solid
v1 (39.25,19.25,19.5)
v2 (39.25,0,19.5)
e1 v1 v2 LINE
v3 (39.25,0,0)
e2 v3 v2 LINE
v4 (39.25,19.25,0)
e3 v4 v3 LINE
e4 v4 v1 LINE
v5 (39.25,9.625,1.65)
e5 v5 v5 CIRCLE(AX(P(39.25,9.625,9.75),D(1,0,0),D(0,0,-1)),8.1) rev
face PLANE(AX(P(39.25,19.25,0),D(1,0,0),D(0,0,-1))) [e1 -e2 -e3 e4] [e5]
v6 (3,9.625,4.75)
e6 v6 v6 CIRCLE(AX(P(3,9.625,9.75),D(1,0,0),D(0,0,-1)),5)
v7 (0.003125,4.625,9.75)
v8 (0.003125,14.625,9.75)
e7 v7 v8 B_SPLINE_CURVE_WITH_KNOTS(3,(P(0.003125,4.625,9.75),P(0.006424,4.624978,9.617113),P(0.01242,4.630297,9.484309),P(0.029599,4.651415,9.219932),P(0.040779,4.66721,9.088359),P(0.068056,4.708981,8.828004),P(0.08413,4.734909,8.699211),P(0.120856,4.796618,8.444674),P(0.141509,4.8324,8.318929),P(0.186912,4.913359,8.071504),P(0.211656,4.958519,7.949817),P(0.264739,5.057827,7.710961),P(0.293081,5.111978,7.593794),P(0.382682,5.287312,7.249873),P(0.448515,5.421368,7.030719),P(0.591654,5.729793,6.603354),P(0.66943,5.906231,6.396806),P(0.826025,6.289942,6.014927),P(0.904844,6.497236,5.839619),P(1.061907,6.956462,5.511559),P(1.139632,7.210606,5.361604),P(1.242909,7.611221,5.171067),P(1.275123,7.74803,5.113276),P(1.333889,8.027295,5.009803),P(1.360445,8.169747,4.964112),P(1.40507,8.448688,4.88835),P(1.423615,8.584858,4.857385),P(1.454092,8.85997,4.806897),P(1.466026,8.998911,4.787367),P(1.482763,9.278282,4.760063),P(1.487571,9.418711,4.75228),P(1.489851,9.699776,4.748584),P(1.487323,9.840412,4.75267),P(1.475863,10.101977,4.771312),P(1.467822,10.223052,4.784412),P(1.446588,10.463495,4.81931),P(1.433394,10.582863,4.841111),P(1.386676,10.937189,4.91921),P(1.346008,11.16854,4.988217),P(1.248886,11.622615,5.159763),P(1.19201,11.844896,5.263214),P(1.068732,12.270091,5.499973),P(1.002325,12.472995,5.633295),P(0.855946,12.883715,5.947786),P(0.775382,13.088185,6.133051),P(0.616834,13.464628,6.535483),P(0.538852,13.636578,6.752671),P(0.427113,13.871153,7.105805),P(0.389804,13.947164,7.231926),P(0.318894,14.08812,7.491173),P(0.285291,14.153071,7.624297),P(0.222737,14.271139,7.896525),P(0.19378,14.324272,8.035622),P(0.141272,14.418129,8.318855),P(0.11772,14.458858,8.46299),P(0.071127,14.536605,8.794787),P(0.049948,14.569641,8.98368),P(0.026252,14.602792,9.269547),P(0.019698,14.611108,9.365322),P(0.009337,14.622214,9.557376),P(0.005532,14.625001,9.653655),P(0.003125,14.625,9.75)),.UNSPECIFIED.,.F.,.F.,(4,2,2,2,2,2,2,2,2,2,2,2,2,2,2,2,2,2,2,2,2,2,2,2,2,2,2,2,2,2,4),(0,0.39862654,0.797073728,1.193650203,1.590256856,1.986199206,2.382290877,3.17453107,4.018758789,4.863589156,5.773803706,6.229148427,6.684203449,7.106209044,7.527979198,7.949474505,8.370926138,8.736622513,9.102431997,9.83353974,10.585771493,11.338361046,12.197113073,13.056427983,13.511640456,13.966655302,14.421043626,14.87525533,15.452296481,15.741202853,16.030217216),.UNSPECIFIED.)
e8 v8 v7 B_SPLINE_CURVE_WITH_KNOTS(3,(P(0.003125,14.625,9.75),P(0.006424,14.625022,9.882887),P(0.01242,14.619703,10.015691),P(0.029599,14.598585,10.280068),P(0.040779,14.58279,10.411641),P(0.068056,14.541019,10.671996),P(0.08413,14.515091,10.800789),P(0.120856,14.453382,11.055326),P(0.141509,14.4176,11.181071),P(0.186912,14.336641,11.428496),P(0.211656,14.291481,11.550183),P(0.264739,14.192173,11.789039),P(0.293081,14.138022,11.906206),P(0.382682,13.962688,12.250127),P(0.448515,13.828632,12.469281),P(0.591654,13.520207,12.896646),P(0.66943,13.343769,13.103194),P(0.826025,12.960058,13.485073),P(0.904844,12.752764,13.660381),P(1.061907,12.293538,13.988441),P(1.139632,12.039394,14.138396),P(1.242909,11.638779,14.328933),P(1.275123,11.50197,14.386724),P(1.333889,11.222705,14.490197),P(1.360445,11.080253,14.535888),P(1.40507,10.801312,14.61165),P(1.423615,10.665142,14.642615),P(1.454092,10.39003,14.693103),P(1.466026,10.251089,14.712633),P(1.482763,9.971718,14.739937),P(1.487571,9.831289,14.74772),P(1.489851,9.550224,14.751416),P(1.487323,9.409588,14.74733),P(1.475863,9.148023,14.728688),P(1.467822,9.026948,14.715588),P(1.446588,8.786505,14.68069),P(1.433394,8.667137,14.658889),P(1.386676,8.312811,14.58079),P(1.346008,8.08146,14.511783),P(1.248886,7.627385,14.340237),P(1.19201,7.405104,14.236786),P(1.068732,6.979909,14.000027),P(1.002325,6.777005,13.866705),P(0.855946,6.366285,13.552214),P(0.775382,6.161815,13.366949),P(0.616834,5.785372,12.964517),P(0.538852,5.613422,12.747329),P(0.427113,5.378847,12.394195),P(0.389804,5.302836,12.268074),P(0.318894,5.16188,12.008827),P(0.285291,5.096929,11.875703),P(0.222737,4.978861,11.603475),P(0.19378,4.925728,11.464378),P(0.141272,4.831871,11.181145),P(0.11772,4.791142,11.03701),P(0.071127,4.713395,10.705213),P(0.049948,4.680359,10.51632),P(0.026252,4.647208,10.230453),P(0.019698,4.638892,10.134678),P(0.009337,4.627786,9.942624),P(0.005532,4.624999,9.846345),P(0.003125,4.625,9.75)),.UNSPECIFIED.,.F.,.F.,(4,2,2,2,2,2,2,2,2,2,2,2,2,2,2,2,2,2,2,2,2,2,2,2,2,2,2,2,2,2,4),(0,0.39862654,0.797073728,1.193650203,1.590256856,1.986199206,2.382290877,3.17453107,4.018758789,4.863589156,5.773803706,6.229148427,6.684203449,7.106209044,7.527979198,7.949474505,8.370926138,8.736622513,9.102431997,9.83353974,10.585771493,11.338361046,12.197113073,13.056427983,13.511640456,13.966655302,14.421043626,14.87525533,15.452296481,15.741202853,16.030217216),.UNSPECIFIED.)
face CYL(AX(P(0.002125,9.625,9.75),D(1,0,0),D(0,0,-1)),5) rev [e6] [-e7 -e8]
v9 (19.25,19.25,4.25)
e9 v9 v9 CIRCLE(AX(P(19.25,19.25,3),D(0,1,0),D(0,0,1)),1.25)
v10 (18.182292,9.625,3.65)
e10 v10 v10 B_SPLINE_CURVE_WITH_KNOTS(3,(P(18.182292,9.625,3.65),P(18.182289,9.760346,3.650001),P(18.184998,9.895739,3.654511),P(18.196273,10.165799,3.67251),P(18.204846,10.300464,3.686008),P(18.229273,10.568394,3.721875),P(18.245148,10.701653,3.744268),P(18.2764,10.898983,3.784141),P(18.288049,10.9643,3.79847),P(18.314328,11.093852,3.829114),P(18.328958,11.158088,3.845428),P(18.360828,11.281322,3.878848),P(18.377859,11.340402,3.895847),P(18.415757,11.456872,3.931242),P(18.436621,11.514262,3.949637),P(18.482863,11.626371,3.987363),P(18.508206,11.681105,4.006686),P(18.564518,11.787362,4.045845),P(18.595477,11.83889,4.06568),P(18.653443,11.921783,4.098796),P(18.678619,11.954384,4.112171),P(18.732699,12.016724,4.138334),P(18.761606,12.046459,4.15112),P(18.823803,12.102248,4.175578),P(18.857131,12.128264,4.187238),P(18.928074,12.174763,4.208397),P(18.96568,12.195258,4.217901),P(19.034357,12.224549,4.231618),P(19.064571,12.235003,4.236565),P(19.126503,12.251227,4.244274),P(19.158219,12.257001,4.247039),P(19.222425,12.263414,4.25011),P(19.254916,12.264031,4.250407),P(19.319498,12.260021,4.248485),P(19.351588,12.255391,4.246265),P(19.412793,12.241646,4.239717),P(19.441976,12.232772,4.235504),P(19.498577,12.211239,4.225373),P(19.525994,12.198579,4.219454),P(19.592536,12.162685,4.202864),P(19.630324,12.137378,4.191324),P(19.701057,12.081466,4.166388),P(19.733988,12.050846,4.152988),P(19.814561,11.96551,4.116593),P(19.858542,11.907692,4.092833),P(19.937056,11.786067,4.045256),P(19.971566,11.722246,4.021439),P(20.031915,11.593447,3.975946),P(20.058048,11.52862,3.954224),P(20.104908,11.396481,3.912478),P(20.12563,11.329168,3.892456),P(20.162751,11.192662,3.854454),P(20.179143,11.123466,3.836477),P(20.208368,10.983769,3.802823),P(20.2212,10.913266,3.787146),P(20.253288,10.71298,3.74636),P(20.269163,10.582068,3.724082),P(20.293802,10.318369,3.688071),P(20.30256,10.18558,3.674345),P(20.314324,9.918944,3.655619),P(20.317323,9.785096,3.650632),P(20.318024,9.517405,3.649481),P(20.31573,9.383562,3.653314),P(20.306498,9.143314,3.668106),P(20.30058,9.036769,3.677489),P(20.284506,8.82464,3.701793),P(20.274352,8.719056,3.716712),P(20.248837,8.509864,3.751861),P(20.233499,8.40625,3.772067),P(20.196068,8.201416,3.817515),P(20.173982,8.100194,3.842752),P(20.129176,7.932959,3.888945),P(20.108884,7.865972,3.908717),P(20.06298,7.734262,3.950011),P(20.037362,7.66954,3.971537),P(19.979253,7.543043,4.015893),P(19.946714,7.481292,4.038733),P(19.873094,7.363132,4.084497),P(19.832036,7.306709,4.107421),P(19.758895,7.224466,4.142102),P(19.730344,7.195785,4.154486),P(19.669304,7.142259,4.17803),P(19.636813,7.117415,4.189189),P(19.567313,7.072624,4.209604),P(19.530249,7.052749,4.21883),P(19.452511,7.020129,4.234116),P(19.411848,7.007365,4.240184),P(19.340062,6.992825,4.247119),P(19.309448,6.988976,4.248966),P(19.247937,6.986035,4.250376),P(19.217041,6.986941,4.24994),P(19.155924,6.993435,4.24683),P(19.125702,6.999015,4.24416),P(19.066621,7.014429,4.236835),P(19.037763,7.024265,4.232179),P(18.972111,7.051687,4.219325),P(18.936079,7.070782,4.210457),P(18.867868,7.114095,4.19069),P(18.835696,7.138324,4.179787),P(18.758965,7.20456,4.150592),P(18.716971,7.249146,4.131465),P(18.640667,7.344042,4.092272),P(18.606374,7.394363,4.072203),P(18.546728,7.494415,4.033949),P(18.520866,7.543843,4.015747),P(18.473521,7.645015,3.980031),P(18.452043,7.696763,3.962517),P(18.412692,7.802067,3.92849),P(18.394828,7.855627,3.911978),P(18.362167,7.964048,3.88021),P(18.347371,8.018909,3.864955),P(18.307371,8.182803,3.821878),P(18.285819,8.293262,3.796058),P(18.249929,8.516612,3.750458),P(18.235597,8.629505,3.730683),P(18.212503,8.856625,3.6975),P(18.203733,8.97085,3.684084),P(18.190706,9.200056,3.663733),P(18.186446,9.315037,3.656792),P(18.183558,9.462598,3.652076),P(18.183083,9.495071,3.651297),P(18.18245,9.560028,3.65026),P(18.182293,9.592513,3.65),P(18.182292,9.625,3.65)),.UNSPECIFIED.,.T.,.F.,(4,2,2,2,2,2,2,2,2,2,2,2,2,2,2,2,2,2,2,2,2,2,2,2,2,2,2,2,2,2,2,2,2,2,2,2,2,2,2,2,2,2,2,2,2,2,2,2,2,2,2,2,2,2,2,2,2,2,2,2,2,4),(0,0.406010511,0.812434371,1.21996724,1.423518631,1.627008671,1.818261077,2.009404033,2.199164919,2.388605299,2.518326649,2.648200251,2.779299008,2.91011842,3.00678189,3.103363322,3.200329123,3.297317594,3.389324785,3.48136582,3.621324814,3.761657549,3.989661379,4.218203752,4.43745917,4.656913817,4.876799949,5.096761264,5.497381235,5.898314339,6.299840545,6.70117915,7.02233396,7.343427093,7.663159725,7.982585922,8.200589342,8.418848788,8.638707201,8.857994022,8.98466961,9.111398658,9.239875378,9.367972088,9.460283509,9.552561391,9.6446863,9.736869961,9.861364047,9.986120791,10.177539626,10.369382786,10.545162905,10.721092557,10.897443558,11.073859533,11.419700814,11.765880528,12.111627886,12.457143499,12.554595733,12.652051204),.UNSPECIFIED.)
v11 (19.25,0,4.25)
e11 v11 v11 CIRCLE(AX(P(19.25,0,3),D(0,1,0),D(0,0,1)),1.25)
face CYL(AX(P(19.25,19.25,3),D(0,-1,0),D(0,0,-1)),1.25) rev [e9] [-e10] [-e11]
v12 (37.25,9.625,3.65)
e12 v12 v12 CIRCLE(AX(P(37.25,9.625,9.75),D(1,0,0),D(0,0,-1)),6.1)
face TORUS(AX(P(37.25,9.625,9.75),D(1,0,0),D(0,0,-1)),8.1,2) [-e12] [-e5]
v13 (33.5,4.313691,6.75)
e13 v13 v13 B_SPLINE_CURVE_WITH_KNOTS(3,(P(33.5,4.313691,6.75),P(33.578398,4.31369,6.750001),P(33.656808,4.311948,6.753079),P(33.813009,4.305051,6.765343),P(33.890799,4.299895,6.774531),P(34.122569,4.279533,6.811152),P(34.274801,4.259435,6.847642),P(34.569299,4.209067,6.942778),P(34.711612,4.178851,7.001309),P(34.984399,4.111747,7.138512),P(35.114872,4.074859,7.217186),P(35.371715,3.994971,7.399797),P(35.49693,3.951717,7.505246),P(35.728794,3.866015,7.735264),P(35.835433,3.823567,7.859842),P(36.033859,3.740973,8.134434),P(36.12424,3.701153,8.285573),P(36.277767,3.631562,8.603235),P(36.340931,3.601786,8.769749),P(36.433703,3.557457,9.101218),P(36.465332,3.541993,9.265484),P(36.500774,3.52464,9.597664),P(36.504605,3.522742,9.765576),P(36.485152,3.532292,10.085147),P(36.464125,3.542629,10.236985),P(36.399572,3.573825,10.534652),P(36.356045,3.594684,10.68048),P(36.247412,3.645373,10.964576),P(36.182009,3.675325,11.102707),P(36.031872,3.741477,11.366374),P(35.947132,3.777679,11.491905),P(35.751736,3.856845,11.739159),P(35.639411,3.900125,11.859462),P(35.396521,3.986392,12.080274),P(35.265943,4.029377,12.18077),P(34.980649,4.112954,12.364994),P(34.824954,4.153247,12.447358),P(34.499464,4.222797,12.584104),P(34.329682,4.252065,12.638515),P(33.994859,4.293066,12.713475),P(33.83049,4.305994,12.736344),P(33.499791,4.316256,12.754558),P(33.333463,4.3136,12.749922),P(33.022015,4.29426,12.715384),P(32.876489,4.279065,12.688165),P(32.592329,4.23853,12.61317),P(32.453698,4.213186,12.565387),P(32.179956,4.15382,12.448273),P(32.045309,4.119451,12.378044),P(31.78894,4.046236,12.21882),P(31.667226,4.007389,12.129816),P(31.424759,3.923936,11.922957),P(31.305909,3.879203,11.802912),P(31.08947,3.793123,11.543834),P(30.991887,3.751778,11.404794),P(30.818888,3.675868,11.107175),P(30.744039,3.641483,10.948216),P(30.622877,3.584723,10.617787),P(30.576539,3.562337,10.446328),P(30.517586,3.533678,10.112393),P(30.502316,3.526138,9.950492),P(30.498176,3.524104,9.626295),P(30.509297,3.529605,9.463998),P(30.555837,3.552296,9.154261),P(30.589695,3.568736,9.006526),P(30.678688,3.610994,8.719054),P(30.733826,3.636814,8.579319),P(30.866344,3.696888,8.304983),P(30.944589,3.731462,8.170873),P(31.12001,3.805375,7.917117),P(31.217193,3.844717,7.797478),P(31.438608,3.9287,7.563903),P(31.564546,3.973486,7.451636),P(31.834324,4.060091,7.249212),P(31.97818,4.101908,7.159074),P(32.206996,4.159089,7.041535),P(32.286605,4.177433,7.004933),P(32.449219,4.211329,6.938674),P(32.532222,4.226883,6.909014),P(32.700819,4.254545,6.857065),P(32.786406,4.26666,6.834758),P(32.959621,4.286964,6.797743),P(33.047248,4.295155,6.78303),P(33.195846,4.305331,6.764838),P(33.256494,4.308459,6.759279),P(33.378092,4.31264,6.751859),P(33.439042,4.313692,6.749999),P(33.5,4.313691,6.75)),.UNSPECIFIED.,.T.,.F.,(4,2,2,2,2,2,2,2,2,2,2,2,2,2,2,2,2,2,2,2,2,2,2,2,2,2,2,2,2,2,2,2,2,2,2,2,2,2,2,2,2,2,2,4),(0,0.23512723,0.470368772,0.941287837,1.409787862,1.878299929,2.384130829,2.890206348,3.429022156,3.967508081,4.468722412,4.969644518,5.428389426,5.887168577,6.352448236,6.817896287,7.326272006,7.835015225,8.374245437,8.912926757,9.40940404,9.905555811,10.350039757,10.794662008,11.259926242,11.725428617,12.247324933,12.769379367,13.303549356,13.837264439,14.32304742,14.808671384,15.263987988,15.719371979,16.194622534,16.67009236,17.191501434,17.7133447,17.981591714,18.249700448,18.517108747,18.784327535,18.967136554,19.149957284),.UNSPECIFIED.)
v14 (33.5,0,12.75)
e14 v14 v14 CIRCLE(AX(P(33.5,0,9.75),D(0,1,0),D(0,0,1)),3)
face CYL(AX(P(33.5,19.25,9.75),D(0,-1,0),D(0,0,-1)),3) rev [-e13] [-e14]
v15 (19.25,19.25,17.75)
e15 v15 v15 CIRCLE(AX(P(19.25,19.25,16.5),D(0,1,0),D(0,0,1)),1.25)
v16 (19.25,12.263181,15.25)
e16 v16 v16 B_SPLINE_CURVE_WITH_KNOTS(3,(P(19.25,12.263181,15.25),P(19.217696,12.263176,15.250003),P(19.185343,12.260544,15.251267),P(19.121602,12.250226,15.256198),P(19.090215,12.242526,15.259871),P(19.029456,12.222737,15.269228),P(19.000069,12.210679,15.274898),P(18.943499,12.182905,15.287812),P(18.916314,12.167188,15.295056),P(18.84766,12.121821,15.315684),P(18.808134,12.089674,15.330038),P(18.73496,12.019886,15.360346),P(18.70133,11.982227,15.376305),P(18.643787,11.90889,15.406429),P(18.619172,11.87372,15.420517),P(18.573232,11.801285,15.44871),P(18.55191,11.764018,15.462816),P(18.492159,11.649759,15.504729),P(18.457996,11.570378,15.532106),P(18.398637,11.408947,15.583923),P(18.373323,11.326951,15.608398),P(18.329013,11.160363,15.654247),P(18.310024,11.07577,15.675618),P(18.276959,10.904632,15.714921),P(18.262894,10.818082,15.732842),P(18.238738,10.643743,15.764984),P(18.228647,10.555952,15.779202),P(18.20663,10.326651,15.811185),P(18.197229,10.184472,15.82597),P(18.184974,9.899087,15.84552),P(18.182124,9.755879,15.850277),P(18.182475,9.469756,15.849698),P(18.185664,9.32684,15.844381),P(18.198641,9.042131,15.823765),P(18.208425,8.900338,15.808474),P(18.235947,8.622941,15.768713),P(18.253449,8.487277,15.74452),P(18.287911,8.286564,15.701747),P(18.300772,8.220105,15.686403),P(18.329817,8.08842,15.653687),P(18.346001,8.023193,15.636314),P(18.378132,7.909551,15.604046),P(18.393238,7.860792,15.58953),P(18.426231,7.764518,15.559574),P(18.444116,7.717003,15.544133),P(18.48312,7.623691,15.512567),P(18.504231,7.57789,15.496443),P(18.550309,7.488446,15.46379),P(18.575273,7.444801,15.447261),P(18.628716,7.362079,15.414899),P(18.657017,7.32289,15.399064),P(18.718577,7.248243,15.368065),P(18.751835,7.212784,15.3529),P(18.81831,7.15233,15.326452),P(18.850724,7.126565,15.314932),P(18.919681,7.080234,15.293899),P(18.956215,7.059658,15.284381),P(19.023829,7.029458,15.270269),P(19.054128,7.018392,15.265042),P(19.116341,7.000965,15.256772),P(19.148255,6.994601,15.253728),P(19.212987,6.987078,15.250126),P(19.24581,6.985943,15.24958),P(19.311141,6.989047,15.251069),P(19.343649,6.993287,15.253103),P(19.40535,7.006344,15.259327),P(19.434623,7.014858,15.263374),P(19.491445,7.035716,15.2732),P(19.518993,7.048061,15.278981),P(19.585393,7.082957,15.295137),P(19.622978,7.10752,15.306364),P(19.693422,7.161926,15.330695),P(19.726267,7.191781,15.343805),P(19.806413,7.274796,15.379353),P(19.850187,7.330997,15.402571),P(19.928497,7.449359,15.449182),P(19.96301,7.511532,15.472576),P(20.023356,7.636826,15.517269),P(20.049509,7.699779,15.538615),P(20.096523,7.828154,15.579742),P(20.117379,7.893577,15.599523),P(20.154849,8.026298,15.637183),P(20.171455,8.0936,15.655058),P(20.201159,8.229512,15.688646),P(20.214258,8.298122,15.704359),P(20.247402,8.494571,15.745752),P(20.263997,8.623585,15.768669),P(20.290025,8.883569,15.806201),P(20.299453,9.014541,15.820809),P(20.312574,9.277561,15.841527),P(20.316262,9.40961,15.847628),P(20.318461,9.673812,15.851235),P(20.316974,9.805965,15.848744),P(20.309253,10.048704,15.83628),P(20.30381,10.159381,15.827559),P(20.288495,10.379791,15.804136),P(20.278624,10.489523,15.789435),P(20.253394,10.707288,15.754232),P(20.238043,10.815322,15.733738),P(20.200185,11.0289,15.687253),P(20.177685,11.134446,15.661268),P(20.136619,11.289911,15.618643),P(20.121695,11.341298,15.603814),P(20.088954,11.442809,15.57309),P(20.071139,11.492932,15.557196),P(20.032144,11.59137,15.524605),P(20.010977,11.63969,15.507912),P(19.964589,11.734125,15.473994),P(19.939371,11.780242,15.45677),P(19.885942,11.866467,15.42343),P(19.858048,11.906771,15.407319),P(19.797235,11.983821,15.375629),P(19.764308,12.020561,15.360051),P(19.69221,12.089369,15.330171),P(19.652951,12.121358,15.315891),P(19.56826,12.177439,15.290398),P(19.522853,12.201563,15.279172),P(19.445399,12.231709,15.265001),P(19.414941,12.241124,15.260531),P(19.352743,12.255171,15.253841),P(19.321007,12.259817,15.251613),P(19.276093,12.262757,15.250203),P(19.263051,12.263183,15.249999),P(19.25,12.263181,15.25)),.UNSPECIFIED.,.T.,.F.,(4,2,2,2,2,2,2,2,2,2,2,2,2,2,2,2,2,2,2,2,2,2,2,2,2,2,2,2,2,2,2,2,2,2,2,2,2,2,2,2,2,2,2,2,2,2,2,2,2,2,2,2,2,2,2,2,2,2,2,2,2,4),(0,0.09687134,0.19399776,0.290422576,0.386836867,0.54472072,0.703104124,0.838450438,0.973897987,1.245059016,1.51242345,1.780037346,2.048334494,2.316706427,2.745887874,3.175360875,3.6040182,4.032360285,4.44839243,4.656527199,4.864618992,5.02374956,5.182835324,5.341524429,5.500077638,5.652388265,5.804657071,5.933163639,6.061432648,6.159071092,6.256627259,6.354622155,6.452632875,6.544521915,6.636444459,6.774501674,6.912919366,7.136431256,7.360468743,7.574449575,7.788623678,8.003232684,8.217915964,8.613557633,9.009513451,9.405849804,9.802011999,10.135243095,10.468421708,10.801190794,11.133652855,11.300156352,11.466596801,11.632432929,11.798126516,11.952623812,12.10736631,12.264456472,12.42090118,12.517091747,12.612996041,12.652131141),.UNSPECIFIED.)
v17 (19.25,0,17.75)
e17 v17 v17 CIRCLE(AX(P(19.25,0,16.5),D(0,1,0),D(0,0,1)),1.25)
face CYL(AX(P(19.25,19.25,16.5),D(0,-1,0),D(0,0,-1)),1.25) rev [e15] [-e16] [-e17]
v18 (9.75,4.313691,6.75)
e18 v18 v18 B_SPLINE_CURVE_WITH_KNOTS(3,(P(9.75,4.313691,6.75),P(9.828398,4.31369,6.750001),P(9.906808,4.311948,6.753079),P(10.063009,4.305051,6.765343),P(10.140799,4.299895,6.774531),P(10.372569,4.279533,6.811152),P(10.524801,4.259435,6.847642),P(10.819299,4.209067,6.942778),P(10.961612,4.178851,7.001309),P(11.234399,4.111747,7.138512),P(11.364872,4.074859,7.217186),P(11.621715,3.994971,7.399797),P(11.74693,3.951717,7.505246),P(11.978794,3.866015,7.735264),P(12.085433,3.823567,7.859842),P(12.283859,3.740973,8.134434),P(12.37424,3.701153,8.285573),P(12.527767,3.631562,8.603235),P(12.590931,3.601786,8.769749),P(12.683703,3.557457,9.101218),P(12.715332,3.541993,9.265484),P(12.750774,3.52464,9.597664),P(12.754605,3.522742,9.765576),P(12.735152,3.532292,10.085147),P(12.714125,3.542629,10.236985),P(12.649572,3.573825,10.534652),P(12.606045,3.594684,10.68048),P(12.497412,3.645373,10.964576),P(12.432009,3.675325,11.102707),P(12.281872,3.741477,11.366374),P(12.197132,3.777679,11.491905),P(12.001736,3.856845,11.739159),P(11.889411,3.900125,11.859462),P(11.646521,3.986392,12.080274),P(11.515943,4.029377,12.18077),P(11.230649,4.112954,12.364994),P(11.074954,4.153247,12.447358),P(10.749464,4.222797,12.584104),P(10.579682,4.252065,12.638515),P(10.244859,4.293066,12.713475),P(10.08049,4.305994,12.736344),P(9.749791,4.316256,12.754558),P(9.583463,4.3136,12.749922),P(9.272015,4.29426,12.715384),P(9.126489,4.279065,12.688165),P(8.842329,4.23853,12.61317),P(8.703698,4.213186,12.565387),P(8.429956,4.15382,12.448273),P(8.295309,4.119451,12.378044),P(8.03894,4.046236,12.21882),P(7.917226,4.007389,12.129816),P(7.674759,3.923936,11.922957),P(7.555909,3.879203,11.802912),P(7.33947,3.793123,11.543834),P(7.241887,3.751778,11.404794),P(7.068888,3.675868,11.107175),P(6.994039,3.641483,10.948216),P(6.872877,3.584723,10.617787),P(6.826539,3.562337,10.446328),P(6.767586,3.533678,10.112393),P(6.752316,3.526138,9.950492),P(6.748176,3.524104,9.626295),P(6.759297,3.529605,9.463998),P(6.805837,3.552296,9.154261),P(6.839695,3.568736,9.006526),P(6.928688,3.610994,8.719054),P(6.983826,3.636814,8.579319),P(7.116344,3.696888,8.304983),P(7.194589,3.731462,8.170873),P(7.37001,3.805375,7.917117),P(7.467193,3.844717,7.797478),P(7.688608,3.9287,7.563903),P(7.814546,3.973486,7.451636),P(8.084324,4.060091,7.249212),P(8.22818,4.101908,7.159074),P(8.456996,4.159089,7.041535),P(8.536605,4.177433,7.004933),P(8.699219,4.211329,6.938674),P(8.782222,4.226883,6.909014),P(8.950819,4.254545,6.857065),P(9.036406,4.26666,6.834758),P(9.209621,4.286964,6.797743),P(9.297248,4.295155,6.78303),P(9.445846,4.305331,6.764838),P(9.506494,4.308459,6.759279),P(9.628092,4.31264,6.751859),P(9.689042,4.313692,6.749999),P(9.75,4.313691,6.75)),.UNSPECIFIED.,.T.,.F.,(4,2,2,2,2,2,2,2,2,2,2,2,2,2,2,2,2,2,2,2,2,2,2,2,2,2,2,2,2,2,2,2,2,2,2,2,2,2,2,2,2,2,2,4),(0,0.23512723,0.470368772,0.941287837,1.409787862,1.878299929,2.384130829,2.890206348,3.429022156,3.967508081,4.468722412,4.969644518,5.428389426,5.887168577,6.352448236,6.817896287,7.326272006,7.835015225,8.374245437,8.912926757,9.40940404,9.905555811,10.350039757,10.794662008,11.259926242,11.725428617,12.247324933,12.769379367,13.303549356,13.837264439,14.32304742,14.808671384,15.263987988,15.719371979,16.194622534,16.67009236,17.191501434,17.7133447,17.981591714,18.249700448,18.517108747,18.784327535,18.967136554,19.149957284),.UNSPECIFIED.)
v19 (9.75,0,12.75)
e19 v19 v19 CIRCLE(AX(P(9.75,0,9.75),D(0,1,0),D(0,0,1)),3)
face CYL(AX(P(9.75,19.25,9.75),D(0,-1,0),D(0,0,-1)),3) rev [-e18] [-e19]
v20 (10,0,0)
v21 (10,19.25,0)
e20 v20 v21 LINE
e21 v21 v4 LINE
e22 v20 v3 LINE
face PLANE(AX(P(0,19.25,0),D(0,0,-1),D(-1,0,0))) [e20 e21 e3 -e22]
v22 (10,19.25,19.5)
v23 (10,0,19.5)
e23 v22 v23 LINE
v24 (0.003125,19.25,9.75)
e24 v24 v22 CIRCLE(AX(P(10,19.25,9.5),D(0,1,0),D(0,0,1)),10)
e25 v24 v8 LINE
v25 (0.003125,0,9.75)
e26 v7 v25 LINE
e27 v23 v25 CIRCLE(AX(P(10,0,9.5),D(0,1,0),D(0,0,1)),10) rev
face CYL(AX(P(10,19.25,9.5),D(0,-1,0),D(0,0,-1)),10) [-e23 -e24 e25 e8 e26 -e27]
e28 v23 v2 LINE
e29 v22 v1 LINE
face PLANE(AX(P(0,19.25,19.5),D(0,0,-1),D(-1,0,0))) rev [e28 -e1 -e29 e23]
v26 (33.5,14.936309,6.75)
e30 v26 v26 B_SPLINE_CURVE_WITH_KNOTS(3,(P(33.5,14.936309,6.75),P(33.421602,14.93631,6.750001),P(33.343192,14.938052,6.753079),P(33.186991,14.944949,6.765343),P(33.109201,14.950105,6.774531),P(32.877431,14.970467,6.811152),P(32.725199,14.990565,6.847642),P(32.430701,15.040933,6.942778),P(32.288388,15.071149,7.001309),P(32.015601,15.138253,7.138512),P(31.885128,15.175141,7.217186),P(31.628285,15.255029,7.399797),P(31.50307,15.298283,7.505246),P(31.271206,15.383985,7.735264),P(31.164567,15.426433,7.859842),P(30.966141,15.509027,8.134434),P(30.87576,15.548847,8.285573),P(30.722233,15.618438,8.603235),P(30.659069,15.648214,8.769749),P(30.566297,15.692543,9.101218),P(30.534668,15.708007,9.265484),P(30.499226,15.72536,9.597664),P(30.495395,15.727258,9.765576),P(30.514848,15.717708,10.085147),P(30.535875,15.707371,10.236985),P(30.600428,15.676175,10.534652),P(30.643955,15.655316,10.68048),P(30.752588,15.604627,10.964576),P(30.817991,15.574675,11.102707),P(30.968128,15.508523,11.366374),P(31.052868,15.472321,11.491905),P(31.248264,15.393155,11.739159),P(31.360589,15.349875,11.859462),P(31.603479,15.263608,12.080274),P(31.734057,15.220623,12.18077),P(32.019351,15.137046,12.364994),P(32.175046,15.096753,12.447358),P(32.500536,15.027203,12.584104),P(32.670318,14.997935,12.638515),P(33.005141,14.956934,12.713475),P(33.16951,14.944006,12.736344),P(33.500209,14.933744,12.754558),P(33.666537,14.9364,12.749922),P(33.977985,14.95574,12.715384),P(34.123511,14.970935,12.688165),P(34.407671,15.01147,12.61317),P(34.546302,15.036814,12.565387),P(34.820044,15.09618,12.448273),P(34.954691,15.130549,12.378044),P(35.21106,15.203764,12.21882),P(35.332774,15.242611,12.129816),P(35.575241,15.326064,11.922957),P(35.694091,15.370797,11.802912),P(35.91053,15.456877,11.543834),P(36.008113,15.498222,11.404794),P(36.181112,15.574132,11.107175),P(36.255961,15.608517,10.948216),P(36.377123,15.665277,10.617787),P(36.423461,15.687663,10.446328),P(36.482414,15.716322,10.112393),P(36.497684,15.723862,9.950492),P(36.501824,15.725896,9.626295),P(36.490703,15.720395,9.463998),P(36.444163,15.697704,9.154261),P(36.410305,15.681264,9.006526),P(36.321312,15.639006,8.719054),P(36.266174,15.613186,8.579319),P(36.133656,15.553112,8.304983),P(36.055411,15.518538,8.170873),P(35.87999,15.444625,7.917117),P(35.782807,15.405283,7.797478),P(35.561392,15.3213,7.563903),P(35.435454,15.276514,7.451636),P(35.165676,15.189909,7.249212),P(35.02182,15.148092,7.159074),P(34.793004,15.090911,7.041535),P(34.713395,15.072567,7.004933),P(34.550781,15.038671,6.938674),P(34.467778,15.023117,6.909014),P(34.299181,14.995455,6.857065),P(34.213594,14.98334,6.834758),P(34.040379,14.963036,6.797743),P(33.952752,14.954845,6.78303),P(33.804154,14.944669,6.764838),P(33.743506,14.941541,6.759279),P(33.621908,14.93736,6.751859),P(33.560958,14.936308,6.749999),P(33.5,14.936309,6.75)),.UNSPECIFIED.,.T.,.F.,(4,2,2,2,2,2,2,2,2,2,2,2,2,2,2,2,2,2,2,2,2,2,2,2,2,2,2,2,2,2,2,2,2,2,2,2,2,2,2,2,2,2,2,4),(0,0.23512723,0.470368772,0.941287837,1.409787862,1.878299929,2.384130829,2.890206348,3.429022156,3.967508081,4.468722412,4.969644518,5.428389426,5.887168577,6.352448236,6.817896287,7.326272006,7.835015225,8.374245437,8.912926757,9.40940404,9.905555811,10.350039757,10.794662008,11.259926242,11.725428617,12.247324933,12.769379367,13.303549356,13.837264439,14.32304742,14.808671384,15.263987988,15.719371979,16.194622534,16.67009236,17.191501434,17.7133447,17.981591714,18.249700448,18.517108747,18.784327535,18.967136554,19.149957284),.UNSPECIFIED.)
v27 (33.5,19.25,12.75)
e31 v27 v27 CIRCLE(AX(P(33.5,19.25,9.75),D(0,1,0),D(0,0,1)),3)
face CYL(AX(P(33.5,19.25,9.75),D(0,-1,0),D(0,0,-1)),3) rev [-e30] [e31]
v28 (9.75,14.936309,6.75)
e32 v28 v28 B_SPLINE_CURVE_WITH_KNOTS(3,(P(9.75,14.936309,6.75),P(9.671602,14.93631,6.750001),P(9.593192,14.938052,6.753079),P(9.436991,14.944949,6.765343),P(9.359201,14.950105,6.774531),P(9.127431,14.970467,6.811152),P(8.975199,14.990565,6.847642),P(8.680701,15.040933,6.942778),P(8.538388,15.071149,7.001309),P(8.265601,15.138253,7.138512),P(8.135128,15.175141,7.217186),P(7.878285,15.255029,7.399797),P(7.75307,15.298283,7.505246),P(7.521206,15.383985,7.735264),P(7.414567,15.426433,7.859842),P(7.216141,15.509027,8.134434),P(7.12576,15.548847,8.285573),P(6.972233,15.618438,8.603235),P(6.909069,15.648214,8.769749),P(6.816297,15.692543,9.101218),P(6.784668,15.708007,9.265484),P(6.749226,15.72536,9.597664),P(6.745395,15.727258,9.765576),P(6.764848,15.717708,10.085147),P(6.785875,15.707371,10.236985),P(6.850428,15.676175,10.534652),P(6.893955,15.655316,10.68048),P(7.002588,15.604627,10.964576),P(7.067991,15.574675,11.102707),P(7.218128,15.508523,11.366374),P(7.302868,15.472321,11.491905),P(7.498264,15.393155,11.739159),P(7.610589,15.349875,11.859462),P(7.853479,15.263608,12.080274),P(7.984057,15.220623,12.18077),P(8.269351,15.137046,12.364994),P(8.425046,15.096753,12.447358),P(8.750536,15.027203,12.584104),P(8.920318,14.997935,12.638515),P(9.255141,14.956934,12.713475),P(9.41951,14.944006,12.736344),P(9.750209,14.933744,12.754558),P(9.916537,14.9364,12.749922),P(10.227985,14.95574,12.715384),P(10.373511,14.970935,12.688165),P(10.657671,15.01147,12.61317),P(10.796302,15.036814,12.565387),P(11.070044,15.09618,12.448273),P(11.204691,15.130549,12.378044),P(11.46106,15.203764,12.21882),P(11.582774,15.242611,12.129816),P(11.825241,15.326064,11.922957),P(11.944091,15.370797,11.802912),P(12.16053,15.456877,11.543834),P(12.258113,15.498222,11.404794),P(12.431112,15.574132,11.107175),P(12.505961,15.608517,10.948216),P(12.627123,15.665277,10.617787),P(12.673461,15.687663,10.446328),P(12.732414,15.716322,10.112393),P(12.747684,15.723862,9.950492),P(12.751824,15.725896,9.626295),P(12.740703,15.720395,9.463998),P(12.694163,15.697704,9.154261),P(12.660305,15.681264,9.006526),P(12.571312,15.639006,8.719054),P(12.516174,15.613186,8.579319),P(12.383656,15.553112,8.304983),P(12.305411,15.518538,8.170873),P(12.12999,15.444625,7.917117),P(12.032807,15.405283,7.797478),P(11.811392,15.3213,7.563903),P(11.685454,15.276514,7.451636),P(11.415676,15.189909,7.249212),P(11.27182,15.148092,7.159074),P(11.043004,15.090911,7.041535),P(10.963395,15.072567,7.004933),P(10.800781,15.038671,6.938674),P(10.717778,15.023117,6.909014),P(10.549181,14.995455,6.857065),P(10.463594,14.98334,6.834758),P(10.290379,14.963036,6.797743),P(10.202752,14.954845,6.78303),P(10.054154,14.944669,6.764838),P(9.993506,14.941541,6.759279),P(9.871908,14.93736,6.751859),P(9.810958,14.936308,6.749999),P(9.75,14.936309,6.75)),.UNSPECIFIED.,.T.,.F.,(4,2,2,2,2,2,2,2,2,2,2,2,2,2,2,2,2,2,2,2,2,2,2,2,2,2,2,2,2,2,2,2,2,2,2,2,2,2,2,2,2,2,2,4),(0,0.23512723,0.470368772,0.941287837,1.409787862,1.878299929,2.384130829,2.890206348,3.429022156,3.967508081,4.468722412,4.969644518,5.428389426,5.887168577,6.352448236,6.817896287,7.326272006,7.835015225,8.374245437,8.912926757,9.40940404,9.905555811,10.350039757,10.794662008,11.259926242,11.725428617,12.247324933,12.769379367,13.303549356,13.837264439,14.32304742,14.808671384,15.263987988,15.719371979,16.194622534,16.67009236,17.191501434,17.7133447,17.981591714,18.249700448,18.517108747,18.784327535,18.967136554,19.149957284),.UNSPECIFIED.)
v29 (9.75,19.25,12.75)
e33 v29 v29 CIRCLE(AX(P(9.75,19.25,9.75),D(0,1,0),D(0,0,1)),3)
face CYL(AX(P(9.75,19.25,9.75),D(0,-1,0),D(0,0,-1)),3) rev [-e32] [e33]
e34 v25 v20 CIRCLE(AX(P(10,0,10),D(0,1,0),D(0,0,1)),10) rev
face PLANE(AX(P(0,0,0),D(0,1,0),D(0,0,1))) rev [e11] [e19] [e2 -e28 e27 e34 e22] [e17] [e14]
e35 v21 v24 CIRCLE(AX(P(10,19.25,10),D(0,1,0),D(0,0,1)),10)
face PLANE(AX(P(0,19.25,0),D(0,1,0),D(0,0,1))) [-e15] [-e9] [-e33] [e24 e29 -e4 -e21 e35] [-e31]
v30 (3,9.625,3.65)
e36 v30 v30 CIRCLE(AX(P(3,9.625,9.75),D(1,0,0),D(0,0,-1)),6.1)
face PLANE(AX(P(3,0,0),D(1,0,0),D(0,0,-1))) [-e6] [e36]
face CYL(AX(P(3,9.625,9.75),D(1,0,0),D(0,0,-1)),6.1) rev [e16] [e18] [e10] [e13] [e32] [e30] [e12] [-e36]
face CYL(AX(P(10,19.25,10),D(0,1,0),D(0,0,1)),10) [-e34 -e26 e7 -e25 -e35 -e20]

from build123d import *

# Parameters (mm, degrees)
SKETCH1_W           = 39.25
SKETCH1_H           = 19.5
SKETCH1_R           = 1.25
SKETCH1_R_2         = 3
BOSS_EXTRUDE1_DEPTH = 19.25
CUT_EXTRUDE1_DEPTH  = 36.25
FILLET1_R           = 2
FILLET3_R           = 10
CUT_EXTRUDE3_REACH  = 47.441
SKETCH4_R           = 5


with BuildPart() as part:
    # Sketch1 → Boss-Extrude1 (new body)
    with BuildSketch(Plane(origin=(0, 0, 0), x_dir=(1, 0, 0), z_dir=(0, 1, 0))):
        with Locations((19.625, -9.75)):
            Rectangle(SKETCH1_W, SKETCH1_H)
        with Locations(Location((19.25, -16.5, 0), (0, 0, 270))):
            Circle(SKETCH1_R, mode=Mode.SUBTRACT)
        with Locations(Location((19.25, -3, 0), (0, 0, 270))):
            Circle(SKETCH1_R, mode=Mode.SUBTRACT)
        with Locations(Location((9.75, -9.75, 0), (0, 0, 270))):
            Circle(SKETCH1_R_2, mode=Mode.SUBTRACT)
        with Locations(Location((33.5, -9.75, 0), (0, 0, 270))):
            Circle(SKETCH1_R_2, mode=Mode.SUBTRACT)
    extrude(amount=BOSS_EXTRUDE1_DEPTH)

    # Sketch2 → Cut-Extrude1 (cut)
    with BuildSketch(Plane(origin=(39.25, 0, 0), x_dir=(0, 0, -1), z_dir=(1, 0, 0))):
        with BuildLine():
            ThreePointArc((-3.65, 9.625), (-7.433822489, 15.268165932), (-14.091089094, 13.910434106))
            Line((-14.091089094, 13.910434106), (-5.408910906, 5.339565894))
            ThreePointArc((-5.408910906, 5.339565894), (-4.106834068, 7.308822489), (-3.65, 9.625))
        make_face()
        with BuildLine():
            Line((-5.408910906, 5.339565894), (-14.091089094, 13.910434106))
            ThreePointArc((-14.091089094, 13.910434106), (-14.035434106, 5.283910906), (-5.408910906, 5.339565894))
        make_face()
    extrude(amount=-CUT_EXTRUDE1_DEPTH, mode=Mode.SUBTRACT)

    # Fillet1
    fillet1_edges = [part.edges().sort_by_distance(p)[0] for p in [
        (39.25, 5.339565894, 5.408910906),
    ]]
    fillet(fillet1_edges, radius=FILLET1_R)

    # Fillet3
    # the kernel refuses this fillet: 10 mm, written as the material it takes off along each edge
    with BuildSketch(Plane(origin=(0, -25, 19.5), x_dir=(1, 0, 0), z_dir=(0, 1, 0))) as fillet3_piece_1:
        with BuildLine():
            CenterArc((FILLET3_R, FILLET3_R), FILLET3_R, 180, 90)
            Line((0, FILLET3_R), (0, 0))
            Line((0, 0), (FILLET3_R, 0))
        make_face()
    extrude(amount=69.25, mode=Mode.SUBTRACT)
    with BuildSketch(Plane(origin=(0, -25, 0), x_dir=(1, 0, 0), z_dir=(0, 1, 0))) as fillet3_piece_2:
        with BuildLine():
            CenterArc((FILLET3_R, -FILLET3_R), FILLET3_R, 90, 90)
            Line((0, -FILLET3_R), (0, 0))
            Line((0, 0), (FILLET3_R, 0))
        make_face()
    extrude(amount=69.25, mode=Mode.SUBTRACT)

    # Sketch4 → Cut-Extrude3 (cut, up to next)
    with BuildSketch(Plane(origin=(3, 0, 0), x_dir=(0, 0, -1), z_dir=(1, 0, 0)), mode=Mode.PRIVATE) as cut_extrude3_sk1:
        with Locations((-9.75, 9.625)):
            Circle(SKETCH4_R)
    cut_extrude3_tool1 = extrude(cut_extrude3_sk1.sketch, amount=-CUT_EXTRUDE3_REACH, mode=Mode.PRIVATE) & part.part
    add(cut_extrude3_tool1.solids().sort_by_distance((3, 9.625, 9.75))[0], mode=Mode.SUBTRACT)


solid = part.part
